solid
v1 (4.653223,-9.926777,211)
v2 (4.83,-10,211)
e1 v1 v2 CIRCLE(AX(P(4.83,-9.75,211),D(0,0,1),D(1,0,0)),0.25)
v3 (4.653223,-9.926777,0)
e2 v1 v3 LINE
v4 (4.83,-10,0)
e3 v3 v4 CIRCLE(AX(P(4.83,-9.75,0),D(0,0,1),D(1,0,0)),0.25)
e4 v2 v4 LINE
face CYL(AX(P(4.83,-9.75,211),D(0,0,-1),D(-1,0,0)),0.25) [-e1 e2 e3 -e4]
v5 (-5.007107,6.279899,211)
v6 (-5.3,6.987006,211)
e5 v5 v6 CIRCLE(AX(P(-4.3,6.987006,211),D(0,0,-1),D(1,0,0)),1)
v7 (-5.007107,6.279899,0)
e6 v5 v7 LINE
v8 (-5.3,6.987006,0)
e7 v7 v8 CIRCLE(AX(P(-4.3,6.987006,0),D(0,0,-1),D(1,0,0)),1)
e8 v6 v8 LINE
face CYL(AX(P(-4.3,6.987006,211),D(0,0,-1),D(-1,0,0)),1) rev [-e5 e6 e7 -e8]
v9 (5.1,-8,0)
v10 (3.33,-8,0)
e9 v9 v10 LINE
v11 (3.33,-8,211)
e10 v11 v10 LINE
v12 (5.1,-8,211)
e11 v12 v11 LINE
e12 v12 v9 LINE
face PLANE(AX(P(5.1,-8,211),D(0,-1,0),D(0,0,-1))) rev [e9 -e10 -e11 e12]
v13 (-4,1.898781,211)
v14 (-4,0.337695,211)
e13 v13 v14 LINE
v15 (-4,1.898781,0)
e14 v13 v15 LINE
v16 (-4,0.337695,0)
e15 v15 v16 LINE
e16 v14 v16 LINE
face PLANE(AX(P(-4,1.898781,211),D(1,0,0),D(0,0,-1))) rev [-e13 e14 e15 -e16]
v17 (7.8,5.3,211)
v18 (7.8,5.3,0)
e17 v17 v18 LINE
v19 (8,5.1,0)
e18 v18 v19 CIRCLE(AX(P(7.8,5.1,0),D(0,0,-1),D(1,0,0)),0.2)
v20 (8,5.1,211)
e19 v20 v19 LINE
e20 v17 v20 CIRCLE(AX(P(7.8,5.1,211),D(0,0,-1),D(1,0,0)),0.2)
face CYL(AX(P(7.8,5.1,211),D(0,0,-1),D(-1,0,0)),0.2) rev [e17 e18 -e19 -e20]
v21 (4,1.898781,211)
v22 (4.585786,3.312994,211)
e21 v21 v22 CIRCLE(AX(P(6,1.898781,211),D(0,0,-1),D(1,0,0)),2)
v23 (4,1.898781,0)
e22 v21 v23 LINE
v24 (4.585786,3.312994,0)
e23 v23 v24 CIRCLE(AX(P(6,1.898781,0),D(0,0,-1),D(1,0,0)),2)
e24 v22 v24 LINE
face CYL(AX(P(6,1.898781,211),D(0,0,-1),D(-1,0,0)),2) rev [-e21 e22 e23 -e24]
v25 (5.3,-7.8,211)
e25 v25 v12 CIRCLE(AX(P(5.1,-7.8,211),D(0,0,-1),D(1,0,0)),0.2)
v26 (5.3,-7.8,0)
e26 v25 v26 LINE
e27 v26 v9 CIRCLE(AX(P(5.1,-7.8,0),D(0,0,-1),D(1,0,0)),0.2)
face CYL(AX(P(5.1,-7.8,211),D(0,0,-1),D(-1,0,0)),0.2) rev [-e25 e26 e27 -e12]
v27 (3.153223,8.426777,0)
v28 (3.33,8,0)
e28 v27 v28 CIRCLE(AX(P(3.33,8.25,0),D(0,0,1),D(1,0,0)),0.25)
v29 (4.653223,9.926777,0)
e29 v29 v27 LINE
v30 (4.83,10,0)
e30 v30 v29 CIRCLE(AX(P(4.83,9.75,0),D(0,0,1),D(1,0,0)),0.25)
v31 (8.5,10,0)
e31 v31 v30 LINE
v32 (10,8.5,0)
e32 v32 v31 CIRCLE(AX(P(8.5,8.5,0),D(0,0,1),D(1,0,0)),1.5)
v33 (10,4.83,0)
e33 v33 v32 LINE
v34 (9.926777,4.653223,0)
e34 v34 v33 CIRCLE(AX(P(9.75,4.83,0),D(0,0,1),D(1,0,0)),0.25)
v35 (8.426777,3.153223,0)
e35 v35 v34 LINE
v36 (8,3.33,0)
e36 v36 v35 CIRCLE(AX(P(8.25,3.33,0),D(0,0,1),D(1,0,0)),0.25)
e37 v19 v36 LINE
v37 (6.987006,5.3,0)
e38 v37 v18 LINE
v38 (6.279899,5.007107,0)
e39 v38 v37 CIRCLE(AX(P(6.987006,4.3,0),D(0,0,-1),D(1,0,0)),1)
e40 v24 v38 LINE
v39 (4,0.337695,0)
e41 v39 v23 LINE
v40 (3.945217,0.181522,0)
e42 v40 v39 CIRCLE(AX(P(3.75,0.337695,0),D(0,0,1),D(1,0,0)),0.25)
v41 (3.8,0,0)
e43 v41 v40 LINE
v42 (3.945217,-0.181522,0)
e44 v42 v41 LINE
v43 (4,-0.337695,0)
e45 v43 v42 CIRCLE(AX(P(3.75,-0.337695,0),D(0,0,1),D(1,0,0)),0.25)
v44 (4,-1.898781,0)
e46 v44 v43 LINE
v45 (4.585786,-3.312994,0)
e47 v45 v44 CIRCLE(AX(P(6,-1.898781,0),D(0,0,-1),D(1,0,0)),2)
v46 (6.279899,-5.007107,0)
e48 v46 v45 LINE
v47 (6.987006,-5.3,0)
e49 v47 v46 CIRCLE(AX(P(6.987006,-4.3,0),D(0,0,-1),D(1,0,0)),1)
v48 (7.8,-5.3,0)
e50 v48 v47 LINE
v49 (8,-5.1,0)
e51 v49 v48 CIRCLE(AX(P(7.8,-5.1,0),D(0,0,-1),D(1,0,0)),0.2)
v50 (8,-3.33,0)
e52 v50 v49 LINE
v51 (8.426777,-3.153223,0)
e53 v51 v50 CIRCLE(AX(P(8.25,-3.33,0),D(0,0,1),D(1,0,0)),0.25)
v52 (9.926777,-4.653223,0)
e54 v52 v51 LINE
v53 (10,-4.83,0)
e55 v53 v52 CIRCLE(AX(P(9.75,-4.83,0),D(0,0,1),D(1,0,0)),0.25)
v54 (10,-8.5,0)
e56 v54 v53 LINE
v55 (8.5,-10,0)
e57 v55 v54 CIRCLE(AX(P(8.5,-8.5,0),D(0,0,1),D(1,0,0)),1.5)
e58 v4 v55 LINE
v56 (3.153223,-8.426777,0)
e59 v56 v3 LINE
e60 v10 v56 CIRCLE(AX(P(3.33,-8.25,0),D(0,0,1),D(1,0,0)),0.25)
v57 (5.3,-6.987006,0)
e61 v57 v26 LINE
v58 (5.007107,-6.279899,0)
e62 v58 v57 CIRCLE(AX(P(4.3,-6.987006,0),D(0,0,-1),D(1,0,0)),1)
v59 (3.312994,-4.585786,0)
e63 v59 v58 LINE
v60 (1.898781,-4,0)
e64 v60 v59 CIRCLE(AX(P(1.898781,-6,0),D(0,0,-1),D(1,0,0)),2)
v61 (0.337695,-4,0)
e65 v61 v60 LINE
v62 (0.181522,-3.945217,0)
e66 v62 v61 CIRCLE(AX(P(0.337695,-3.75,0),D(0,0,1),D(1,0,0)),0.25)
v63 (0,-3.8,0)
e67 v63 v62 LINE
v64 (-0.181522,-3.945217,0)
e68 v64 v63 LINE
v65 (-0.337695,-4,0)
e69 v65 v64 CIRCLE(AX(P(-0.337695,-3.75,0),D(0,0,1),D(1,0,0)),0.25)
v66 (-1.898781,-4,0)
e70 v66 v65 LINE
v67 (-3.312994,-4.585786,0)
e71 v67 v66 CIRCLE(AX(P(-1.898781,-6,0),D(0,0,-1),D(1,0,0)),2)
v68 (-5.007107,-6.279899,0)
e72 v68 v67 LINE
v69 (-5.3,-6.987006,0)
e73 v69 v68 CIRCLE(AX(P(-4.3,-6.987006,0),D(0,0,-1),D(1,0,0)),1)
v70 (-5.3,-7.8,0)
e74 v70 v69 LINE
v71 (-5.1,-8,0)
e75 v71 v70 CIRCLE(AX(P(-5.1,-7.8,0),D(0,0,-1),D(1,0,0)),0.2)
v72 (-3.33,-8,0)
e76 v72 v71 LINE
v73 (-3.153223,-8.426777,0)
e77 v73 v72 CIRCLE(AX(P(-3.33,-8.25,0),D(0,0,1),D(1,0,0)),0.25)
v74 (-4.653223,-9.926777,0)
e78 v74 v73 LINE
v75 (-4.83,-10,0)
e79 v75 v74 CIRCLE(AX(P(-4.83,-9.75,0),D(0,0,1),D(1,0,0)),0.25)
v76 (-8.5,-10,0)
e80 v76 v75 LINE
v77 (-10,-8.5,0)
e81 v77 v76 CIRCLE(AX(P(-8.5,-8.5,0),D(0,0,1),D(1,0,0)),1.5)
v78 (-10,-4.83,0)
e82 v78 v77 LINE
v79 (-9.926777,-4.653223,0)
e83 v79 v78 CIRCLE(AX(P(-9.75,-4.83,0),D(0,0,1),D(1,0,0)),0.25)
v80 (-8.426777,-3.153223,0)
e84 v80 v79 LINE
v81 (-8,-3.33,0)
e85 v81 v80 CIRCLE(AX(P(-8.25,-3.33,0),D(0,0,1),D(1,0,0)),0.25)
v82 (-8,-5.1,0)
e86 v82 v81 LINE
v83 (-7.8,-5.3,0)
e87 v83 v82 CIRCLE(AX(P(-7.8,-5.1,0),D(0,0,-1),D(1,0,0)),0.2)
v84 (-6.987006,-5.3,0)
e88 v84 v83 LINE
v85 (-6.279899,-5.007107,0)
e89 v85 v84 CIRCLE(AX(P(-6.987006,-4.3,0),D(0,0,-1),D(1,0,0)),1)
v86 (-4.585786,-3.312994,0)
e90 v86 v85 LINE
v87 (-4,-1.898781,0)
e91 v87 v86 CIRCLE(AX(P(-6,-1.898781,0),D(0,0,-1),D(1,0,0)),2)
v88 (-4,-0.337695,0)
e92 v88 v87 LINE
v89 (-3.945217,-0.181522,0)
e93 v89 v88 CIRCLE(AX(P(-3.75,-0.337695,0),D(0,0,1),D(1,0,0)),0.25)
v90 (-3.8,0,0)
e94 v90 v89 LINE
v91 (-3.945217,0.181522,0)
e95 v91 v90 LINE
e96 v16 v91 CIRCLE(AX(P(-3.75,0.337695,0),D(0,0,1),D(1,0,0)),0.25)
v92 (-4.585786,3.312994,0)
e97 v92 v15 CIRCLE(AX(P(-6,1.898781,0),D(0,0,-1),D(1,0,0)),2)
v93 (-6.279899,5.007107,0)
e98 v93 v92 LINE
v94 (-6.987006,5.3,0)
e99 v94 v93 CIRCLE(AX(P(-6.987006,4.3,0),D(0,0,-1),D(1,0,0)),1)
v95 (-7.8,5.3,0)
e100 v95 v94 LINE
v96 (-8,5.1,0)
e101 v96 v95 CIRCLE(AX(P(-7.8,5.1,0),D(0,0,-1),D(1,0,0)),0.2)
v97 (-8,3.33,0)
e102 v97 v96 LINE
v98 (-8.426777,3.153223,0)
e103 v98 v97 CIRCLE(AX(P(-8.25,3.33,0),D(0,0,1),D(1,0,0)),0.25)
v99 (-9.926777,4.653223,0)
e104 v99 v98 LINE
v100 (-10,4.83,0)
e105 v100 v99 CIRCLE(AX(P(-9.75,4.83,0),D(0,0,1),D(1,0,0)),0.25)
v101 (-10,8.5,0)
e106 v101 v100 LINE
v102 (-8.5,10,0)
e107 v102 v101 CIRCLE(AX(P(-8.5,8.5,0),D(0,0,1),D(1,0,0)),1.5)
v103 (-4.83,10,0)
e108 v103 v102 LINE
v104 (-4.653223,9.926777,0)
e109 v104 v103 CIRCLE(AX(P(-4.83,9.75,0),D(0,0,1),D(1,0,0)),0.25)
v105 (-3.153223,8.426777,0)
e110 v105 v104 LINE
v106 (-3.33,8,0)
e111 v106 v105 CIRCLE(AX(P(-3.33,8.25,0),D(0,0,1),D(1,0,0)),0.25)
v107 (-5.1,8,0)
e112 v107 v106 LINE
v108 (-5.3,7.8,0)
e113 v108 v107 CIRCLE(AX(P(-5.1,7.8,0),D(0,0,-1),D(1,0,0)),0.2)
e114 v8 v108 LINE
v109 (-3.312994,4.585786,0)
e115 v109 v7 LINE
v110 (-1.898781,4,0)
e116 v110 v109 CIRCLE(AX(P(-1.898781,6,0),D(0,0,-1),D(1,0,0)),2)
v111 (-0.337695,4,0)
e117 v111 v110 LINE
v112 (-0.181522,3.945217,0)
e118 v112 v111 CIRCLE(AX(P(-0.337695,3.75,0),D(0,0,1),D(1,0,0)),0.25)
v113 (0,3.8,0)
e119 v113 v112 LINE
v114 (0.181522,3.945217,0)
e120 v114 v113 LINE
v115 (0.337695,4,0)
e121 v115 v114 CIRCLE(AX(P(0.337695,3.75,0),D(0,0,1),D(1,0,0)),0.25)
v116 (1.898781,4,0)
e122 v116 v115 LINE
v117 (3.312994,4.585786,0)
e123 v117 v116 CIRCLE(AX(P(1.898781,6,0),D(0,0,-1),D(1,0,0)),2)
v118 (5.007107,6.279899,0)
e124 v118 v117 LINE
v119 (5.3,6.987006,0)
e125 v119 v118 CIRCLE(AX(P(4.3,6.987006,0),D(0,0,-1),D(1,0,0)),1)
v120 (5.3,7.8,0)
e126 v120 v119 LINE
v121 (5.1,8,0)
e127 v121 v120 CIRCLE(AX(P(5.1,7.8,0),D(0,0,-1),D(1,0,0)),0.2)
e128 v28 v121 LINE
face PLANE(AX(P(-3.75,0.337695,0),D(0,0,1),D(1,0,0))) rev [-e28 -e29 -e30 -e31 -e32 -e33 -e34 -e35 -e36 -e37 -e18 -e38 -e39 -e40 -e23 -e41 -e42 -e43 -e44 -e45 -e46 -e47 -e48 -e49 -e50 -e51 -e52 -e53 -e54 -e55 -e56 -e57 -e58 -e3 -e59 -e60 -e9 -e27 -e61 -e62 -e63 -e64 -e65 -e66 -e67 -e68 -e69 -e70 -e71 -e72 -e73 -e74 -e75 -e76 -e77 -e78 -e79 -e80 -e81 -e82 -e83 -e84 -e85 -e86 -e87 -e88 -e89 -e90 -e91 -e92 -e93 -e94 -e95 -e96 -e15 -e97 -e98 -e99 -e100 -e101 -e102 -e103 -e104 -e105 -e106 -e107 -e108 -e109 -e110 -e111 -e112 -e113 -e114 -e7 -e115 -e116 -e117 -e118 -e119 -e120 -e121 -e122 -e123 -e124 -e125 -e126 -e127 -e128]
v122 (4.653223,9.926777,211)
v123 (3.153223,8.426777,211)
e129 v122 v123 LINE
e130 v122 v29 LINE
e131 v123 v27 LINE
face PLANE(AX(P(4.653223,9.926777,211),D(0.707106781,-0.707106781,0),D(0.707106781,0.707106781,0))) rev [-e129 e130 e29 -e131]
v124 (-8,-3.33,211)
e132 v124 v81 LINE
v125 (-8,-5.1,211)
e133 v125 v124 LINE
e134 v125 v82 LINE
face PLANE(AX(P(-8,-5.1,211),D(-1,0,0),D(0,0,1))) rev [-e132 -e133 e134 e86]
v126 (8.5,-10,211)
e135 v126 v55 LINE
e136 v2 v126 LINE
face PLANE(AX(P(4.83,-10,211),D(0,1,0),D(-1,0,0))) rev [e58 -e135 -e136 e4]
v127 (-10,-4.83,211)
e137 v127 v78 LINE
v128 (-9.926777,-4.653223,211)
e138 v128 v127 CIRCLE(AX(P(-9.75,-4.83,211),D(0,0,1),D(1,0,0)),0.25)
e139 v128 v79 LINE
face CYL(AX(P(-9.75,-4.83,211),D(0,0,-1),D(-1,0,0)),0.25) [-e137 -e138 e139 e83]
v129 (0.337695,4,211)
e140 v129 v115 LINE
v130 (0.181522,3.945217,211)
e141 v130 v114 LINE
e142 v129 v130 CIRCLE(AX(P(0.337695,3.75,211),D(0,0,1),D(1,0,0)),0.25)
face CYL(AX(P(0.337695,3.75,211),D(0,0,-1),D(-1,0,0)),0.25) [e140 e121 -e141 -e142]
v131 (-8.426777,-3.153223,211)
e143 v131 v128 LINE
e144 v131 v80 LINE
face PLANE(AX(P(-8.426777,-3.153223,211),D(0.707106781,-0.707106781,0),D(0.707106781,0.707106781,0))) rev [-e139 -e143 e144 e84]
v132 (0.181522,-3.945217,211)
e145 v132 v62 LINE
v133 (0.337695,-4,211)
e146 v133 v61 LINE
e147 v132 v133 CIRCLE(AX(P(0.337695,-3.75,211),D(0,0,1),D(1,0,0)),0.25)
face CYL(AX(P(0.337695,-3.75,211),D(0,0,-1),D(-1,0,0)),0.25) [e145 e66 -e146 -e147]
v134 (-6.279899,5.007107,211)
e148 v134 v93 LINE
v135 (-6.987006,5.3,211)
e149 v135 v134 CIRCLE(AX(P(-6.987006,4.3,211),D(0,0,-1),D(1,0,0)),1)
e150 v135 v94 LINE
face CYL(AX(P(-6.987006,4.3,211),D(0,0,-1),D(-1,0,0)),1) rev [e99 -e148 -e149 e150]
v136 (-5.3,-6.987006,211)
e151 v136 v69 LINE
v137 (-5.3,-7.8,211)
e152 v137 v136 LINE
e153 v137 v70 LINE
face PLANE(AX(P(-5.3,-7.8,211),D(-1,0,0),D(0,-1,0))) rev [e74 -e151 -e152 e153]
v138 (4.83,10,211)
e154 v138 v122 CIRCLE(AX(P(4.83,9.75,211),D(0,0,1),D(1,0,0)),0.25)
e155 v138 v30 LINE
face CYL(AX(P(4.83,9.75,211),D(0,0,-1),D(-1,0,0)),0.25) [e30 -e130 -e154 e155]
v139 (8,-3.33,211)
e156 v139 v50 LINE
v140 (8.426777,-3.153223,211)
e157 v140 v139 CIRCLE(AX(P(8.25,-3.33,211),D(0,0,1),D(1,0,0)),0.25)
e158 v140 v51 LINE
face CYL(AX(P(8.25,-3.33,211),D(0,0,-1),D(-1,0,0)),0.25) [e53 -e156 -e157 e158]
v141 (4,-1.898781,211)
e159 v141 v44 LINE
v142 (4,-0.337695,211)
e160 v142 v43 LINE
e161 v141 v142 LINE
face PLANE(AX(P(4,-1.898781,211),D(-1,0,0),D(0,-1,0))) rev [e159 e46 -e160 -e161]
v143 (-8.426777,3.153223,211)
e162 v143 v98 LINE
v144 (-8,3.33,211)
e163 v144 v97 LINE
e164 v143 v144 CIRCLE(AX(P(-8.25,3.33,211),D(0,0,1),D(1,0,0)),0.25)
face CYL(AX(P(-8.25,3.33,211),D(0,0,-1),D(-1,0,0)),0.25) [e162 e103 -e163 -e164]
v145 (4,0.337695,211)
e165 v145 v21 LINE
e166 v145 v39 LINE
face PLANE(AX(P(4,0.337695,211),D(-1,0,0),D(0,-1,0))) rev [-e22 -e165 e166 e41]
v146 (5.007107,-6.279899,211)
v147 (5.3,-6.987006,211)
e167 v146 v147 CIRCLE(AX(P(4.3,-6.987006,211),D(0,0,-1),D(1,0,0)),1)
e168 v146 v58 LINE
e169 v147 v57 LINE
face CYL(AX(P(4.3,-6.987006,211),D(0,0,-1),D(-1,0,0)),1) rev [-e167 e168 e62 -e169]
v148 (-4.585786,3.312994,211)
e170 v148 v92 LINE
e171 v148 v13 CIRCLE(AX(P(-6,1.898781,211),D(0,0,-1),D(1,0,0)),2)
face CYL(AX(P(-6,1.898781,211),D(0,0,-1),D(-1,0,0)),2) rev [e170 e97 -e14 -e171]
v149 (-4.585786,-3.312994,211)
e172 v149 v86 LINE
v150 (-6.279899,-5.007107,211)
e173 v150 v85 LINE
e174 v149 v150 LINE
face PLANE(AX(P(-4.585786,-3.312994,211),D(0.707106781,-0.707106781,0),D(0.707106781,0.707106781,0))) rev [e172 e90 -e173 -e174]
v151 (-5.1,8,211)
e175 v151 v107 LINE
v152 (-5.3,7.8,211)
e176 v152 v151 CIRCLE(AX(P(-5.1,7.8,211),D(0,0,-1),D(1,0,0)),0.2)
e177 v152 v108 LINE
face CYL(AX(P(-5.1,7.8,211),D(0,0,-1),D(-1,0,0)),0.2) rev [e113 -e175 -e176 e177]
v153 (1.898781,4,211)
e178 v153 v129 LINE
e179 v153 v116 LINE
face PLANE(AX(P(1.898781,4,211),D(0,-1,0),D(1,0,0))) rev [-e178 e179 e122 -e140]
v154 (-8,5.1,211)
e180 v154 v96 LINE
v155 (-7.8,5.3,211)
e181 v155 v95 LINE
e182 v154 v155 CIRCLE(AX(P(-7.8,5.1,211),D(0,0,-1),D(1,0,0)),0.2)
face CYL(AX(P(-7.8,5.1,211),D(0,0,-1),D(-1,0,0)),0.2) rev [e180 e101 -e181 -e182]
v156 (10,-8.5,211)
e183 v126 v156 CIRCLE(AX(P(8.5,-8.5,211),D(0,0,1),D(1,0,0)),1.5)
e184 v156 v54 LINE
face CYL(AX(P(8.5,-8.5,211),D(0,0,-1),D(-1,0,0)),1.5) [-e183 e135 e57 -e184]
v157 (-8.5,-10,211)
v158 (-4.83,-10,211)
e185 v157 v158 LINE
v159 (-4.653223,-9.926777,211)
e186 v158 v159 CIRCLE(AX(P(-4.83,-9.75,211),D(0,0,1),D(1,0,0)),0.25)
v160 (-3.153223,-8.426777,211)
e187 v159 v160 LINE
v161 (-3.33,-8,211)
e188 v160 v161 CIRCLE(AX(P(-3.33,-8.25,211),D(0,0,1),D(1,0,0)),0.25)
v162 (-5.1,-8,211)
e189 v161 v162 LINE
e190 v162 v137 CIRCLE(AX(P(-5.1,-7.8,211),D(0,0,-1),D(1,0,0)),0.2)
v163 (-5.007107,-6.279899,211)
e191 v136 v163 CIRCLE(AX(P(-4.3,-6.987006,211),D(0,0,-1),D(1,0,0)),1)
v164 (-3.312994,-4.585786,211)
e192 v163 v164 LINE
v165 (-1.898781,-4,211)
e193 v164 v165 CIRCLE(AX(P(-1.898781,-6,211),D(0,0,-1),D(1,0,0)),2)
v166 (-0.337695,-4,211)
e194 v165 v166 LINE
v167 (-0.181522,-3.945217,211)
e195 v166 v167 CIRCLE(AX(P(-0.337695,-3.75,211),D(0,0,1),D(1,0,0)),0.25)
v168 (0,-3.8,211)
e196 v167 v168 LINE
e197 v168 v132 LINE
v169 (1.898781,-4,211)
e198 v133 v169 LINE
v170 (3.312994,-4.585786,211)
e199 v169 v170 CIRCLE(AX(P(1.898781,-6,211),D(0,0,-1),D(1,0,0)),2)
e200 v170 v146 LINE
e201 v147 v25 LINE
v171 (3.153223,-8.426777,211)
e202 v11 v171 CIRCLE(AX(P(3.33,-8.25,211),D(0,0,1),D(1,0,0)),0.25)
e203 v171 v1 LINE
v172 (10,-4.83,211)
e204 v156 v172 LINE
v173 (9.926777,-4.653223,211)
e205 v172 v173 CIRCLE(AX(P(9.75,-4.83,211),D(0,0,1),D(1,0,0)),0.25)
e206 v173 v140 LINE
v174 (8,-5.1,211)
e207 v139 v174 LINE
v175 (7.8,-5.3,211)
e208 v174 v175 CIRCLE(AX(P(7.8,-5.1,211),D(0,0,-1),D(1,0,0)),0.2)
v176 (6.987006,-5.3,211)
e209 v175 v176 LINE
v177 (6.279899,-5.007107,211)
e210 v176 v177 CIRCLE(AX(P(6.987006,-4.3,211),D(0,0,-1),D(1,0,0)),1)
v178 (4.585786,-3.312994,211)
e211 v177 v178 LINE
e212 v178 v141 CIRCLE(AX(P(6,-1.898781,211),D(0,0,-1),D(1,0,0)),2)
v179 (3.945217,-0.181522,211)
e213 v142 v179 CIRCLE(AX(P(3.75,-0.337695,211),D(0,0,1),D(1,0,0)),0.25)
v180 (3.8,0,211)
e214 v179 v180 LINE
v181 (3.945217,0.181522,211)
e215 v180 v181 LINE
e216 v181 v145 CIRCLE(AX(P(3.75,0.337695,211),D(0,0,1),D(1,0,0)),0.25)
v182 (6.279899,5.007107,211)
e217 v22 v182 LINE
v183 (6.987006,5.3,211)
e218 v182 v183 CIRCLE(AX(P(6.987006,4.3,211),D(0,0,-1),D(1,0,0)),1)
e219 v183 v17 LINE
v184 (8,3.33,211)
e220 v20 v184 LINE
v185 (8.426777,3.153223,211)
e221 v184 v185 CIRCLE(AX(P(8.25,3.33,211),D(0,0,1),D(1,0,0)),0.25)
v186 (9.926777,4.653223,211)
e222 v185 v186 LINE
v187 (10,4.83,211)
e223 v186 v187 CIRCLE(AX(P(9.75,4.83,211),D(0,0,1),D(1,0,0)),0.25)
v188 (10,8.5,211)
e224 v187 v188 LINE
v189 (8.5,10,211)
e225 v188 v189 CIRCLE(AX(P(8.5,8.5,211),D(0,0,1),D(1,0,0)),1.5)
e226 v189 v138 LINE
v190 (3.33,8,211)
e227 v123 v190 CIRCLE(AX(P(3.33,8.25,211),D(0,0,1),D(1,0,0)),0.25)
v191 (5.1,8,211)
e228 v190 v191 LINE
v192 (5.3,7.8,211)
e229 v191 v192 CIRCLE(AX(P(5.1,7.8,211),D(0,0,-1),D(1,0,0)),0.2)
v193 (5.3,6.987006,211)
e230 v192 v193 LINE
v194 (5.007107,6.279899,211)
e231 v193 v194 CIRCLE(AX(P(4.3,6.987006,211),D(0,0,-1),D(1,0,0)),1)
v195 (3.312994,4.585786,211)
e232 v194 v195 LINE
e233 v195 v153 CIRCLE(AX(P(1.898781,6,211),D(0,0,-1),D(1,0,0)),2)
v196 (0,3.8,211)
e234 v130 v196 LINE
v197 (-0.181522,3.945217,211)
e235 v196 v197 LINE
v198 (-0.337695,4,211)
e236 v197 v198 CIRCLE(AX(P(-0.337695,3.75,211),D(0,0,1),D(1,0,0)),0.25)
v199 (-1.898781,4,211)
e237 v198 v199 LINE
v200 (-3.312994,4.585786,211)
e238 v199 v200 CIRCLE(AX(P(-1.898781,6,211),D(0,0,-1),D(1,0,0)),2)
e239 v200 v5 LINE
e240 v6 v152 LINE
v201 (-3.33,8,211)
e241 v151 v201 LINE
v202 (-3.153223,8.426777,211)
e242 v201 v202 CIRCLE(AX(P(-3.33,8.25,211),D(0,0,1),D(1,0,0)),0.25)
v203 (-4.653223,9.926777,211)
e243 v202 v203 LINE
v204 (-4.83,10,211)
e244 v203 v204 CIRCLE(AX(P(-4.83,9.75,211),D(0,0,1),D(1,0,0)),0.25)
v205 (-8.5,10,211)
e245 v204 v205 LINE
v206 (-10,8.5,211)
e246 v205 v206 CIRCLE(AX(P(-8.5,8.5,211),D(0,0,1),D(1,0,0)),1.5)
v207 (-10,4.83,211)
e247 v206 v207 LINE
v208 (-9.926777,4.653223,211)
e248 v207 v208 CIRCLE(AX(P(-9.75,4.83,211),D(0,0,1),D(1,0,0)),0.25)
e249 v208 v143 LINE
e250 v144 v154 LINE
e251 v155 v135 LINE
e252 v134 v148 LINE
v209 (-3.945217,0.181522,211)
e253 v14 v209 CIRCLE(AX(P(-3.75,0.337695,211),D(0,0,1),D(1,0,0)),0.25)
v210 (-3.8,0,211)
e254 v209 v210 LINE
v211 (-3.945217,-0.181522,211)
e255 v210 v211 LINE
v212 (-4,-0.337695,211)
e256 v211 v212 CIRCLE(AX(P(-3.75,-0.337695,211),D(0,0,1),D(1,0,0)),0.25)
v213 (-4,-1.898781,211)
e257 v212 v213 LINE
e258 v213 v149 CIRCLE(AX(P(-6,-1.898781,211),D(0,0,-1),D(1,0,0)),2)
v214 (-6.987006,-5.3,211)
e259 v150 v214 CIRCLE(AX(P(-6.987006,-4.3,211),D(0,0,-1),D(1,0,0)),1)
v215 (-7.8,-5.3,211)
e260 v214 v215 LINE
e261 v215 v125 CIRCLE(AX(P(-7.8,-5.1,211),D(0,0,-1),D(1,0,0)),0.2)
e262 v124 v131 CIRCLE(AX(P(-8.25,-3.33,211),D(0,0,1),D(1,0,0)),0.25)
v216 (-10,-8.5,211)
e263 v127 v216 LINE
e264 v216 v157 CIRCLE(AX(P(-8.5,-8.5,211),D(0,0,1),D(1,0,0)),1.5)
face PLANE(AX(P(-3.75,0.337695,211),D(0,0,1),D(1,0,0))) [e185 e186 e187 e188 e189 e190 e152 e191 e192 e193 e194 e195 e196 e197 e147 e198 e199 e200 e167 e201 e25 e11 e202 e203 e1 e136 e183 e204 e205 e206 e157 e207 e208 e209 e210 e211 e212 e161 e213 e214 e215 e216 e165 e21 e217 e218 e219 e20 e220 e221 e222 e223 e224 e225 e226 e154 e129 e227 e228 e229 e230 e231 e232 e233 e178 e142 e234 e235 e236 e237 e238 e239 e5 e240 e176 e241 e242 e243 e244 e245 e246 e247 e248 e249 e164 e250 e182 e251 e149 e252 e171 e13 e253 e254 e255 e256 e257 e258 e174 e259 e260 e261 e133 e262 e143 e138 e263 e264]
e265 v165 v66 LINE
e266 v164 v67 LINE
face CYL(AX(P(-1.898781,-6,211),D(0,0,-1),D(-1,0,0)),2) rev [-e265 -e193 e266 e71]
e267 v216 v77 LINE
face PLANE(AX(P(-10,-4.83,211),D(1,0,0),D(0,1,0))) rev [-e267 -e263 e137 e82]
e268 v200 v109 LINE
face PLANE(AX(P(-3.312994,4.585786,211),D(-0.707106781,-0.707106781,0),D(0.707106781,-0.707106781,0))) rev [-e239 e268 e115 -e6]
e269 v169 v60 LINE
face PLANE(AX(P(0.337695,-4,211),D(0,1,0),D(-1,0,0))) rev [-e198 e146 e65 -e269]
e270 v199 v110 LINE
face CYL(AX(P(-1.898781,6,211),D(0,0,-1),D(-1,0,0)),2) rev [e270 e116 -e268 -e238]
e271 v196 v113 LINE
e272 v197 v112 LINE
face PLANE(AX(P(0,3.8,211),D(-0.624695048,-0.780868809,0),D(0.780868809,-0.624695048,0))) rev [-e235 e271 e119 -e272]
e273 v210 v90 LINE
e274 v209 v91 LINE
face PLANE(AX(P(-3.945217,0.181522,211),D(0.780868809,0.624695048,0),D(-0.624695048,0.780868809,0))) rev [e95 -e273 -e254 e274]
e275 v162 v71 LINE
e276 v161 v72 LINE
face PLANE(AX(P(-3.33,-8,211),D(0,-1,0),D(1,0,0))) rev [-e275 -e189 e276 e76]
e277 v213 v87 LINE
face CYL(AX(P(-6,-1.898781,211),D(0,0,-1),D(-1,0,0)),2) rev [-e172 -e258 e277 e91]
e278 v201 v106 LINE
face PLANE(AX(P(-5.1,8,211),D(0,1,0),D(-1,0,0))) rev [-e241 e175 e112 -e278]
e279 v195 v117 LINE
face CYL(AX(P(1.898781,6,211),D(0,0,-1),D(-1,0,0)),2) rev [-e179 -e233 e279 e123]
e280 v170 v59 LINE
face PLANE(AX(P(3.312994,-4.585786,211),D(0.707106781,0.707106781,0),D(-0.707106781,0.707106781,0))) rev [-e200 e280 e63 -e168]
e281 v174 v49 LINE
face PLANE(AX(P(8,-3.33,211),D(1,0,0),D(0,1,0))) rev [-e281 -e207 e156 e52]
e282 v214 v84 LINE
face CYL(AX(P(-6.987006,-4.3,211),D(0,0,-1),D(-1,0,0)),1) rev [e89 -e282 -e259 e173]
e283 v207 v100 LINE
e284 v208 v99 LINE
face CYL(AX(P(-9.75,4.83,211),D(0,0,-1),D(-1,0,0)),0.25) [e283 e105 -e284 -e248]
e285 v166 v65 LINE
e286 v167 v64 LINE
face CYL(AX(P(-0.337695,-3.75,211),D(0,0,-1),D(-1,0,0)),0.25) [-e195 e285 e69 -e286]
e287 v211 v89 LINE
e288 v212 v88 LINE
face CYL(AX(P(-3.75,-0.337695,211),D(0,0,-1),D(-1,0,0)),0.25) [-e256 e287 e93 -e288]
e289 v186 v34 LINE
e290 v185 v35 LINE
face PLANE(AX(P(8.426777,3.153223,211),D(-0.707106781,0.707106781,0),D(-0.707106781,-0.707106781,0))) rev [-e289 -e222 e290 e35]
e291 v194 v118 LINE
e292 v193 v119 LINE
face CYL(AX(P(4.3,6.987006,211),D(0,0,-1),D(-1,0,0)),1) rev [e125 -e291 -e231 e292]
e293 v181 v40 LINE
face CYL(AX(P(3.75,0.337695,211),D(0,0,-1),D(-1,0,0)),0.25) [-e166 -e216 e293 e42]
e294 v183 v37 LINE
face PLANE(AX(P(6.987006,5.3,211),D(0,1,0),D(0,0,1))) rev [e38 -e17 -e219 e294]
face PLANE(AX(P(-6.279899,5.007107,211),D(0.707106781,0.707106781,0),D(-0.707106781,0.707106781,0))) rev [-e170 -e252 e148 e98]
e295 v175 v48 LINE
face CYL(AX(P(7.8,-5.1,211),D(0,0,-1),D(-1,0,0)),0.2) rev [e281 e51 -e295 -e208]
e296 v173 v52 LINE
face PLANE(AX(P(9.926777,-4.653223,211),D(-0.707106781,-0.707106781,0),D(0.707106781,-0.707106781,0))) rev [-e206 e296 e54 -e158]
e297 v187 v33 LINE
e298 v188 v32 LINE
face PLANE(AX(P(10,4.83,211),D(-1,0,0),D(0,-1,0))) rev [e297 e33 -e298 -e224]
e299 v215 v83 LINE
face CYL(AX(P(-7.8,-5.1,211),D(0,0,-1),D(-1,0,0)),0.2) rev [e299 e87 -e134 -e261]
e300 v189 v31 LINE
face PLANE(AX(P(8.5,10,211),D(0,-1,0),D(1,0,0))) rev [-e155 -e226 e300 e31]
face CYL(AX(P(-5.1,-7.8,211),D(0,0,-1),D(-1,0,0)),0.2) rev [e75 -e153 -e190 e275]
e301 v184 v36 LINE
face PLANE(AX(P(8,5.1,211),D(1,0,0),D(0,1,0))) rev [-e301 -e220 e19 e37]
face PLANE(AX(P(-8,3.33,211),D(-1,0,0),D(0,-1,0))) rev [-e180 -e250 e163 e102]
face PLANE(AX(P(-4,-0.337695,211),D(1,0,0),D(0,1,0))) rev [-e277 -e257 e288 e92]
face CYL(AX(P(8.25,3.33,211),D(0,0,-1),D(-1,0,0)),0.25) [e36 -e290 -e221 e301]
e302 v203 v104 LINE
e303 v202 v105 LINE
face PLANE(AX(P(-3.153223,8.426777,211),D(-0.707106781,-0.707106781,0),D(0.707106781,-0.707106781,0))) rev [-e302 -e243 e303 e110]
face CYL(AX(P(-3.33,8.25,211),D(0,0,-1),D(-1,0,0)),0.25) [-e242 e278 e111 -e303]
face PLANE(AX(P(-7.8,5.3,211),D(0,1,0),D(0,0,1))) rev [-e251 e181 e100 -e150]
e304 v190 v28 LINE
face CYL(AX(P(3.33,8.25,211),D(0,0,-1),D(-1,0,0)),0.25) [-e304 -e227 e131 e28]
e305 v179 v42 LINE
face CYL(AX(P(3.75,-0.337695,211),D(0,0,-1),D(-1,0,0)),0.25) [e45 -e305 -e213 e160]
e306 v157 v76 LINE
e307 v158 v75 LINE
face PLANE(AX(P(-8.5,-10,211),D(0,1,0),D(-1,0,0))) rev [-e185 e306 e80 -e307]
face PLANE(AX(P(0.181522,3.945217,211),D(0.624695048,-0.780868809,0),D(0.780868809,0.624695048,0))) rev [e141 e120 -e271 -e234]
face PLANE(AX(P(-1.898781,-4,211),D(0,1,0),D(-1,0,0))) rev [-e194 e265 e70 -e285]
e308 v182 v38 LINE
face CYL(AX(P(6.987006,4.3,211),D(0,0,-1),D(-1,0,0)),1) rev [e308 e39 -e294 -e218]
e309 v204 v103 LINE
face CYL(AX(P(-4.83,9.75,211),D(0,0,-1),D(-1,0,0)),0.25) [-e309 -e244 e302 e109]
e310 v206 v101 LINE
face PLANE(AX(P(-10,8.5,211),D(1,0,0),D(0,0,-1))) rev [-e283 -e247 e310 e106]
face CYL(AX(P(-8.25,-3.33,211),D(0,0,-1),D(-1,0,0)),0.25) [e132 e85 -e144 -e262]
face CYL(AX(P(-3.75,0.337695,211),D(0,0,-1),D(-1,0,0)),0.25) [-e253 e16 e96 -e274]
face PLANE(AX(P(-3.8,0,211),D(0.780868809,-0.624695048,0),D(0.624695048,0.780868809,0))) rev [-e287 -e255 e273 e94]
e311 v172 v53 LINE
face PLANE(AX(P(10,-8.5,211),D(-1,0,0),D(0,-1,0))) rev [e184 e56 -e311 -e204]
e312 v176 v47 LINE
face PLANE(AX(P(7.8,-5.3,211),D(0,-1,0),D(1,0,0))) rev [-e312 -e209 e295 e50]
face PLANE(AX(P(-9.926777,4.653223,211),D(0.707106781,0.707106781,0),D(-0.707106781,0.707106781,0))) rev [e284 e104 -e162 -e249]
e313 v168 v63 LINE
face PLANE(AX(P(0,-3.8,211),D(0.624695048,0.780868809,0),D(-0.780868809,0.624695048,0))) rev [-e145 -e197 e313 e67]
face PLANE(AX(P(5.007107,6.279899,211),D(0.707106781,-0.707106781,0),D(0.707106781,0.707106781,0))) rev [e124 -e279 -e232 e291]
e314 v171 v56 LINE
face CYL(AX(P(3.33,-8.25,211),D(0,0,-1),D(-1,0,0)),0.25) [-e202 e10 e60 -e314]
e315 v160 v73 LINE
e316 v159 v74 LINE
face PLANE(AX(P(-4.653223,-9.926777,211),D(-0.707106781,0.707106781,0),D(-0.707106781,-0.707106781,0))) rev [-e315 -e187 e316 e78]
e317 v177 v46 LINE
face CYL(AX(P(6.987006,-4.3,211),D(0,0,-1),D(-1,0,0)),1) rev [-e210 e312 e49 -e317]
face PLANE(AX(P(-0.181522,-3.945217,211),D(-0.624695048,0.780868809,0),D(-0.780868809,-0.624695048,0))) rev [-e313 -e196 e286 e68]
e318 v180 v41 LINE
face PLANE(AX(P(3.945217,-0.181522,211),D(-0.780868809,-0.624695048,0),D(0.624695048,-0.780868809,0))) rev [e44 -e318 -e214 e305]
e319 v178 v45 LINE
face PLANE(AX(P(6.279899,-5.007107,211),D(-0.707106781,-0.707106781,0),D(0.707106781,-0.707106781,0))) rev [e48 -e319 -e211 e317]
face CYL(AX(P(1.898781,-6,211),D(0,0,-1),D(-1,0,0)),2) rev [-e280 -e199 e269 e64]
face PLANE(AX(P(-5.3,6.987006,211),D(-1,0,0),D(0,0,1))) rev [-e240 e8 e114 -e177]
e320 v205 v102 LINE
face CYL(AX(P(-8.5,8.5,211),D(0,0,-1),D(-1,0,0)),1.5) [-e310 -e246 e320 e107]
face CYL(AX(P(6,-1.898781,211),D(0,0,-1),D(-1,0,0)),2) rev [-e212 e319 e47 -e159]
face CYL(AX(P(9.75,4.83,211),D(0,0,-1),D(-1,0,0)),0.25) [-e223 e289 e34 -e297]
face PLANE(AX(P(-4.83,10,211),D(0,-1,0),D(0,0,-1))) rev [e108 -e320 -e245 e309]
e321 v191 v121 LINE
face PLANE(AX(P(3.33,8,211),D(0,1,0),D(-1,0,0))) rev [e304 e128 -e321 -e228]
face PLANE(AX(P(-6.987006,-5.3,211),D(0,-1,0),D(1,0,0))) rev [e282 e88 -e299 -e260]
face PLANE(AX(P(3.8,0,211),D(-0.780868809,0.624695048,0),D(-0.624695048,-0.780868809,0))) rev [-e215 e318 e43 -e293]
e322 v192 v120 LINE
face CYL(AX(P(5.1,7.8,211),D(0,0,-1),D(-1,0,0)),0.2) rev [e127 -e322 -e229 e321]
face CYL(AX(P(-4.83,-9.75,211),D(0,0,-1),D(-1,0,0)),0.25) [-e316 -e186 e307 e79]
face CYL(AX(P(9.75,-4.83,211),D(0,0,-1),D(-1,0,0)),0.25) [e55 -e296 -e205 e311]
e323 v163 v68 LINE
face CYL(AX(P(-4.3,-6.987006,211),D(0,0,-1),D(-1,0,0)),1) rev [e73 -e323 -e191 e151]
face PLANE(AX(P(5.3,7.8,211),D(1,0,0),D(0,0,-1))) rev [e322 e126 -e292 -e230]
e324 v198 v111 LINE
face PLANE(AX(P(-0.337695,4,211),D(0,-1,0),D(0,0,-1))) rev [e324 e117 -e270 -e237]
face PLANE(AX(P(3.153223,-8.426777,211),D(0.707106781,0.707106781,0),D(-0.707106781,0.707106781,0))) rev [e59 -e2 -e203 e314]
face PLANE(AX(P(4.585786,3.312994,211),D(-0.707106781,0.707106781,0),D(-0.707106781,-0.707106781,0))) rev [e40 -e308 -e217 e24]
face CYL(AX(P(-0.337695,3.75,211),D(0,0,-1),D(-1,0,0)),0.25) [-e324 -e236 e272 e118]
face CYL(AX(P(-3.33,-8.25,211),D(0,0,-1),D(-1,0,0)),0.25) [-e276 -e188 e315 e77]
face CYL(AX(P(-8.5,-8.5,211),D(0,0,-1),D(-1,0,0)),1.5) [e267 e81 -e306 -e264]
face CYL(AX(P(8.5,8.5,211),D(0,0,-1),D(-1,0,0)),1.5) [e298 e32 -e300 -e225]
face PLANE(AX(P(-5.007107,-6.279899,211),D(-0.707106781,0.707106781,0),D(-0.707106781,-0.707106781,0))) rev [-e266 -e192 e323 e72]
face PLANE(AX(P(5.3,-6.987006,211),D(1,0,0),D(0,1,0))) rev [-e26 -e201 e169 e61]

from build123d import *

# Parameters (mm, degrees)
EXTRUDE_1_DEPTH = 211


# Read off the part's stored shape, not the designer's step: 222 Конструкционный профиль 20х20-1-surface1
with BuildPart() as part:
    # Эскиз1 → Бобышка-Вытянуть1 (new body)
    with BuildSketch(Plane.XY):
        with BuildLine():
            Line((-3.945217202, 0.181521503), (-3.8, 0))
            Line((-3.8, 0), (-3.945217202, -0.181521503))
            ThreePointArc((-3.945217202, -0.181521503), (-3.98590708, -0.254943529), (-4, -0.337695265))
            Line((-4, -0.337695265), (-4, -1.898780669))
            ThreePointArc((-4, -1.898780669), (-4.152240935, -2.664147534), (-4.585786438, -3.312994231))
            Line((-4.585786438, -3.312994231), (-6.279898987, -5.007106781))
            ThreePointArc((-6.279898987, -5.007106781), (-6.604322336, -5.223879533), (-6.987005769, -5.3))
            Line((-6.987005769, -5.3), (-7.8, -5.3))
            ThreePointArc((-7.8, -5.3), (-7.941421356, -5.241421356), (-8, -5.1))
            Line((-8, -5.1), (-8, -3.33))
            ThreePointArc((-8, -3.33), (-8.154329142, -3.099030117), (-8.426776695, -3.153223305))
            Line((-8.426776695, -3.153223305), (-9.926776695, -4.653223305))
            ThreePointArc((-9.926776695, -4.653223305), (-9.980969883, -4.734329142), (-10, -4.83))
            Line((-10, -4.83), (-10, -8.5))
            ThreePointArc((-10, -8.5), (-9.560660172, -9.560660172), (-8.5, -10))
            Line((-8.5, -10), (-4.83, -10))
            ThreePointArc((-4.83, -10), (-4.734329142, -9.980969883), (-4.653223305, -9.926776695))
            Line((-4.653223305, -9.926776695), (-3.153223305, -8.426776695))
            ThreePointArc((-3.153223305, -8.426776695), (-3.099030117, -8.154329142), (-3.33, -8))
            Line((-3.33, -8), (-5.1, -8))
            ThreePointArc((-5.1, -8), (-5.241421356, -7.941421356), (-5.3, -7.8))
            Line((-5.3, -7.8), (-5.3, -6.987005769))
            ThreePointArc((-5.3, -6.987005769), (-5.223879533, -6.604322336), (-5.007106781, -6.279898987))
            Line((-5.007106781, -6.279898987), (-3.312994231, -4.585786438))
            ThreePointArc((-3.312994231, -4.585786438), (-2.664147534, -4.152240935), (-1.898780669, -4))
            Line((-1.898780669, -4), (-0.337695265, -4))
            ThreePointArc((-0.337695265, -4), (-0.254943529, -3.98590708), (-0.181521503, -3.945217202))
            Line((-0.181521503, -3.945217202), (0, -3.8))
            Line((0, -3.8), (0.181521503, -3.945217202))
            ThreePointArc((0.181521503, -3.945217202), (0.254943529, -3.98590708), (0.337695265, -4))
            Line((0.337695265, -4), (1.898780669, -4))
            ThreePointArc((1.898780669, -4), (2.664147534, -4.152240935), (3.312994231, -4.585786438))
            Line((3.312994231, -4.585786438), (5.007106781, -6.279898987))
            ThreePointArc((5.007106781, -6.279898987), (5.223879533, -6.604322336), (5.3, -6.987005769))
            Line((5.3, -6.987005769), (5.3, -7.8))
            ThreePointArc((5.3, -7.8), (5.241421356, -7.941421356), (5.1, -8))
            Line((5.1, -8), (3.33, -8))
            ThreePointArc((3.33, -8), (3.099030117, -8.154329142), (3.153223305, -8.426776695))
            Line((3.153223305, -8.426776695), (4.653223305, -9.926776695))
            ThreePointArc((4.653223305, -9.926776695), (4.734329142, -9.980969883), (4.83, -10))
            Line((4.83, -10), (8.5, -10))
            ThreePointArc((8.5, -10), (9.560660172, -9.560660172), (10, -8.5))
            Line((10, -8.5), (10, -4.83))
            ThreePointArc((10, -4.83), (9.980969883, -4.734329142), (9.926776695, -4.653223305))
            Line((9.926776695, -4.653223305), (8.426776695, -3.153223305))
            ThreePointArc((8.426776695, -3.153223305), (8.154329142, -3.099030117), (8, -3.33))
            Line((8, -3.33), (8, -5.1))
            ThreePointArc((8, -5.1), (7.941421356, -5.241421356), (7.8, -5.3))
            Line((7.8, -5.3), (6.987005769, -5.3))
            ThreePointArc((6.987005769, -5.3), (6.604322336, -5.223879533), (6.279898987, -5.007106781))
            Line((6.279898987, -5.007106781), (4.585786438, -3.312994231))
            ThreePointArc((4.585786438, -3.312994231), (4.152240935, -2.664147534), (4, -1.898780669))
            Line((4, -1.898780669), (4, -0.337695265))
            ThreePointArc((4, -0.337695265), (3.98590708, -0.254943529), (3.945217202, -0.181521503))
            Line((3.945217202, -0.181521503), (3.8, 0))
            Line((3.8, 0), (3.945217202, 0.181521503))
            ThreePointArc((3.945217202, 0.181521503), (3.98590708, 0.254943529), (4, 0.337695265))
            Line((4, 0.337695265), (4, 1.898780669))
            ThreePointArc((4, 1.898780669), (4.152240935, 2.664147534), (4.585786438, 3.312994231))
            Line((4.585786438, 3.312994231), (6.279898987, 5.007106781))
            ThreePointArc((6.279898987, 5.007106781), (6.604322336, 5.223879533), (6.987005769, 5.3))
            Line((6.987005769, 5.3), (7.8, 5.3))
            ThreePointArc((7.8, 5.3), (7.941421356, 5.241421356), (8, 5.1))
            Line((8, 5.1), (8, 3.33))
            ThreePointArc((8, 3.33), (8.154329142, 3.099030117), (8.426776695, 3.153223305))
            Line((8.426776695, 3.153223305), (9.926776695, 4.653223305))
            ThreePointArc((9.926776695, 4.653223305), (9.980969883, 4.734329142), (10, 4.83))
            Line((10, 4.83), (10, 8.5))
            ThreePointArc((10, 8.5), (9.560660172, 9.560660172), (8.5, 10))
            Line((8.5, 10), (4.83, 10))
            ThreePointArc((4.83, 10), (4.734329142, 9.980969883), (4.653223305, 9.926776695))
            Line((4.653223305, 9.926776695), (3.153223305, 8.426776695))
            ThreePointArc((3.153223305, 8.426776695), (3.099030117, 8.154329142), (3.33, 8))
            Line((3.33, 8), (5.1, 8))
            ThreePointArc((5.1, 8), (5.241421356, 7.941421356), (5.3, 7.8))
            Line((5.3, 7.8), (5.3, 6.987005769))
            ThreePointArc((5.3, 6.987005769), (5.223879533, 6.604322336), (5.007106781, 6.279898987))
            Line((5.007106781, 6.279898987), (3.312994231, 4.585786438))
            ThreePointArc((3.312994231, 4.585786438), (2.664147534, 4.152240935), (1.898780669, 4))
            Line((1.898780669, 4), (0.337695265, 4))
            ThreePointArc((0.337695265, 4), (0.254943529, 3.98590708), (0.181521503, 3.945217202))
            Line((0.181521503, 3.945217202), (0, 3.8))
            Line((0, 3.8), (-0.181521503, 3.945217202))
            ThreePointArc((-0.181521503, 3.945217202), (-0.254943529, 3.98590708), (-0.337695265, 4))
            Line((-0.337695265, 4), (-1.898780669, 4))
            ThreePointArc((-1.898780669, 4), (-2.664147534, 4.152240935), (-3.312994231, 4.585786438))
            Line((-3.312994231, 4.585786438), (-5.007106781, 6.279898987))
            ThreePointArc((-5.007106781, 6.279898987), (-5.223879533, 6.604322336), (-5.3, 6.987005769))
            Line((-5.3, 6.987005769), (-5.3, 7.8))
            ThreePointArc((-5.3, 7.8), (-5.241421356, 7.941421356), (-5.1, 8))
            Line((-5.1, 8), (-3.33, 8))
            ThreePointArc((-3.33, 8), (-3.099030117, 8.154329142), (-3.153223305, 8.426776695))
            Line((-3.153223305, 8.426776695), (-4.653223305, 9.926776695))
            ThreePointArc((-4.653223305, 9.926776695), (-4.734329142, 9.980969883), (-4.83, 10))
            Line((-4.83, 10), (-8.5, 10))
            ThreePointArc((-8.5, 10), (-9.560660172, 9.560660172), (-10, 8.5))
            Line((-10, 8.5), (-10, 4.83))
            ThreePointArc((-10, 4.83), (-9.980969883, 4.734329142), (-9.926776695, 4.653223305))
            Line((-9.926776695, 4.653223305), (-8.426776695, 3.153223305))
            ThreePointArc((-8.426776695, 3.153223305), (-8.154329142, 3.099030117), (-8, 3.33))
            Line((-8, 3.33), (-8, 5.1))
            ThreePointArc((-8, 5.1), (-7.941421356, 5.241421356), (-7.8, 5.3))
            Line((-7.8, 5.3), (-6.987005769, 5.3))
            ThreePointArc((-6.987005769, 5.3), (-6.604322336, 5.223879533), (-6.279898987, 5.007106781))
            Line((-6.279898987, 5.007106781), (-4.585786438, 3.312994231))
            ThreePointArc((-4.585786438, 3.312994231), (-4.152240935, 2.664147534), (-4, 1.898780669))
            Line((-4, 1.898780669), (-4, 0.337695265))
            ThreePointArc((-4, 0.337695265), (-3.98590708, 0.254943529), (-3.945217202, 0.181521503))
        make_face()
    extrude(amount=EXTRUDE_1_DEPTH)


solid = part.part
